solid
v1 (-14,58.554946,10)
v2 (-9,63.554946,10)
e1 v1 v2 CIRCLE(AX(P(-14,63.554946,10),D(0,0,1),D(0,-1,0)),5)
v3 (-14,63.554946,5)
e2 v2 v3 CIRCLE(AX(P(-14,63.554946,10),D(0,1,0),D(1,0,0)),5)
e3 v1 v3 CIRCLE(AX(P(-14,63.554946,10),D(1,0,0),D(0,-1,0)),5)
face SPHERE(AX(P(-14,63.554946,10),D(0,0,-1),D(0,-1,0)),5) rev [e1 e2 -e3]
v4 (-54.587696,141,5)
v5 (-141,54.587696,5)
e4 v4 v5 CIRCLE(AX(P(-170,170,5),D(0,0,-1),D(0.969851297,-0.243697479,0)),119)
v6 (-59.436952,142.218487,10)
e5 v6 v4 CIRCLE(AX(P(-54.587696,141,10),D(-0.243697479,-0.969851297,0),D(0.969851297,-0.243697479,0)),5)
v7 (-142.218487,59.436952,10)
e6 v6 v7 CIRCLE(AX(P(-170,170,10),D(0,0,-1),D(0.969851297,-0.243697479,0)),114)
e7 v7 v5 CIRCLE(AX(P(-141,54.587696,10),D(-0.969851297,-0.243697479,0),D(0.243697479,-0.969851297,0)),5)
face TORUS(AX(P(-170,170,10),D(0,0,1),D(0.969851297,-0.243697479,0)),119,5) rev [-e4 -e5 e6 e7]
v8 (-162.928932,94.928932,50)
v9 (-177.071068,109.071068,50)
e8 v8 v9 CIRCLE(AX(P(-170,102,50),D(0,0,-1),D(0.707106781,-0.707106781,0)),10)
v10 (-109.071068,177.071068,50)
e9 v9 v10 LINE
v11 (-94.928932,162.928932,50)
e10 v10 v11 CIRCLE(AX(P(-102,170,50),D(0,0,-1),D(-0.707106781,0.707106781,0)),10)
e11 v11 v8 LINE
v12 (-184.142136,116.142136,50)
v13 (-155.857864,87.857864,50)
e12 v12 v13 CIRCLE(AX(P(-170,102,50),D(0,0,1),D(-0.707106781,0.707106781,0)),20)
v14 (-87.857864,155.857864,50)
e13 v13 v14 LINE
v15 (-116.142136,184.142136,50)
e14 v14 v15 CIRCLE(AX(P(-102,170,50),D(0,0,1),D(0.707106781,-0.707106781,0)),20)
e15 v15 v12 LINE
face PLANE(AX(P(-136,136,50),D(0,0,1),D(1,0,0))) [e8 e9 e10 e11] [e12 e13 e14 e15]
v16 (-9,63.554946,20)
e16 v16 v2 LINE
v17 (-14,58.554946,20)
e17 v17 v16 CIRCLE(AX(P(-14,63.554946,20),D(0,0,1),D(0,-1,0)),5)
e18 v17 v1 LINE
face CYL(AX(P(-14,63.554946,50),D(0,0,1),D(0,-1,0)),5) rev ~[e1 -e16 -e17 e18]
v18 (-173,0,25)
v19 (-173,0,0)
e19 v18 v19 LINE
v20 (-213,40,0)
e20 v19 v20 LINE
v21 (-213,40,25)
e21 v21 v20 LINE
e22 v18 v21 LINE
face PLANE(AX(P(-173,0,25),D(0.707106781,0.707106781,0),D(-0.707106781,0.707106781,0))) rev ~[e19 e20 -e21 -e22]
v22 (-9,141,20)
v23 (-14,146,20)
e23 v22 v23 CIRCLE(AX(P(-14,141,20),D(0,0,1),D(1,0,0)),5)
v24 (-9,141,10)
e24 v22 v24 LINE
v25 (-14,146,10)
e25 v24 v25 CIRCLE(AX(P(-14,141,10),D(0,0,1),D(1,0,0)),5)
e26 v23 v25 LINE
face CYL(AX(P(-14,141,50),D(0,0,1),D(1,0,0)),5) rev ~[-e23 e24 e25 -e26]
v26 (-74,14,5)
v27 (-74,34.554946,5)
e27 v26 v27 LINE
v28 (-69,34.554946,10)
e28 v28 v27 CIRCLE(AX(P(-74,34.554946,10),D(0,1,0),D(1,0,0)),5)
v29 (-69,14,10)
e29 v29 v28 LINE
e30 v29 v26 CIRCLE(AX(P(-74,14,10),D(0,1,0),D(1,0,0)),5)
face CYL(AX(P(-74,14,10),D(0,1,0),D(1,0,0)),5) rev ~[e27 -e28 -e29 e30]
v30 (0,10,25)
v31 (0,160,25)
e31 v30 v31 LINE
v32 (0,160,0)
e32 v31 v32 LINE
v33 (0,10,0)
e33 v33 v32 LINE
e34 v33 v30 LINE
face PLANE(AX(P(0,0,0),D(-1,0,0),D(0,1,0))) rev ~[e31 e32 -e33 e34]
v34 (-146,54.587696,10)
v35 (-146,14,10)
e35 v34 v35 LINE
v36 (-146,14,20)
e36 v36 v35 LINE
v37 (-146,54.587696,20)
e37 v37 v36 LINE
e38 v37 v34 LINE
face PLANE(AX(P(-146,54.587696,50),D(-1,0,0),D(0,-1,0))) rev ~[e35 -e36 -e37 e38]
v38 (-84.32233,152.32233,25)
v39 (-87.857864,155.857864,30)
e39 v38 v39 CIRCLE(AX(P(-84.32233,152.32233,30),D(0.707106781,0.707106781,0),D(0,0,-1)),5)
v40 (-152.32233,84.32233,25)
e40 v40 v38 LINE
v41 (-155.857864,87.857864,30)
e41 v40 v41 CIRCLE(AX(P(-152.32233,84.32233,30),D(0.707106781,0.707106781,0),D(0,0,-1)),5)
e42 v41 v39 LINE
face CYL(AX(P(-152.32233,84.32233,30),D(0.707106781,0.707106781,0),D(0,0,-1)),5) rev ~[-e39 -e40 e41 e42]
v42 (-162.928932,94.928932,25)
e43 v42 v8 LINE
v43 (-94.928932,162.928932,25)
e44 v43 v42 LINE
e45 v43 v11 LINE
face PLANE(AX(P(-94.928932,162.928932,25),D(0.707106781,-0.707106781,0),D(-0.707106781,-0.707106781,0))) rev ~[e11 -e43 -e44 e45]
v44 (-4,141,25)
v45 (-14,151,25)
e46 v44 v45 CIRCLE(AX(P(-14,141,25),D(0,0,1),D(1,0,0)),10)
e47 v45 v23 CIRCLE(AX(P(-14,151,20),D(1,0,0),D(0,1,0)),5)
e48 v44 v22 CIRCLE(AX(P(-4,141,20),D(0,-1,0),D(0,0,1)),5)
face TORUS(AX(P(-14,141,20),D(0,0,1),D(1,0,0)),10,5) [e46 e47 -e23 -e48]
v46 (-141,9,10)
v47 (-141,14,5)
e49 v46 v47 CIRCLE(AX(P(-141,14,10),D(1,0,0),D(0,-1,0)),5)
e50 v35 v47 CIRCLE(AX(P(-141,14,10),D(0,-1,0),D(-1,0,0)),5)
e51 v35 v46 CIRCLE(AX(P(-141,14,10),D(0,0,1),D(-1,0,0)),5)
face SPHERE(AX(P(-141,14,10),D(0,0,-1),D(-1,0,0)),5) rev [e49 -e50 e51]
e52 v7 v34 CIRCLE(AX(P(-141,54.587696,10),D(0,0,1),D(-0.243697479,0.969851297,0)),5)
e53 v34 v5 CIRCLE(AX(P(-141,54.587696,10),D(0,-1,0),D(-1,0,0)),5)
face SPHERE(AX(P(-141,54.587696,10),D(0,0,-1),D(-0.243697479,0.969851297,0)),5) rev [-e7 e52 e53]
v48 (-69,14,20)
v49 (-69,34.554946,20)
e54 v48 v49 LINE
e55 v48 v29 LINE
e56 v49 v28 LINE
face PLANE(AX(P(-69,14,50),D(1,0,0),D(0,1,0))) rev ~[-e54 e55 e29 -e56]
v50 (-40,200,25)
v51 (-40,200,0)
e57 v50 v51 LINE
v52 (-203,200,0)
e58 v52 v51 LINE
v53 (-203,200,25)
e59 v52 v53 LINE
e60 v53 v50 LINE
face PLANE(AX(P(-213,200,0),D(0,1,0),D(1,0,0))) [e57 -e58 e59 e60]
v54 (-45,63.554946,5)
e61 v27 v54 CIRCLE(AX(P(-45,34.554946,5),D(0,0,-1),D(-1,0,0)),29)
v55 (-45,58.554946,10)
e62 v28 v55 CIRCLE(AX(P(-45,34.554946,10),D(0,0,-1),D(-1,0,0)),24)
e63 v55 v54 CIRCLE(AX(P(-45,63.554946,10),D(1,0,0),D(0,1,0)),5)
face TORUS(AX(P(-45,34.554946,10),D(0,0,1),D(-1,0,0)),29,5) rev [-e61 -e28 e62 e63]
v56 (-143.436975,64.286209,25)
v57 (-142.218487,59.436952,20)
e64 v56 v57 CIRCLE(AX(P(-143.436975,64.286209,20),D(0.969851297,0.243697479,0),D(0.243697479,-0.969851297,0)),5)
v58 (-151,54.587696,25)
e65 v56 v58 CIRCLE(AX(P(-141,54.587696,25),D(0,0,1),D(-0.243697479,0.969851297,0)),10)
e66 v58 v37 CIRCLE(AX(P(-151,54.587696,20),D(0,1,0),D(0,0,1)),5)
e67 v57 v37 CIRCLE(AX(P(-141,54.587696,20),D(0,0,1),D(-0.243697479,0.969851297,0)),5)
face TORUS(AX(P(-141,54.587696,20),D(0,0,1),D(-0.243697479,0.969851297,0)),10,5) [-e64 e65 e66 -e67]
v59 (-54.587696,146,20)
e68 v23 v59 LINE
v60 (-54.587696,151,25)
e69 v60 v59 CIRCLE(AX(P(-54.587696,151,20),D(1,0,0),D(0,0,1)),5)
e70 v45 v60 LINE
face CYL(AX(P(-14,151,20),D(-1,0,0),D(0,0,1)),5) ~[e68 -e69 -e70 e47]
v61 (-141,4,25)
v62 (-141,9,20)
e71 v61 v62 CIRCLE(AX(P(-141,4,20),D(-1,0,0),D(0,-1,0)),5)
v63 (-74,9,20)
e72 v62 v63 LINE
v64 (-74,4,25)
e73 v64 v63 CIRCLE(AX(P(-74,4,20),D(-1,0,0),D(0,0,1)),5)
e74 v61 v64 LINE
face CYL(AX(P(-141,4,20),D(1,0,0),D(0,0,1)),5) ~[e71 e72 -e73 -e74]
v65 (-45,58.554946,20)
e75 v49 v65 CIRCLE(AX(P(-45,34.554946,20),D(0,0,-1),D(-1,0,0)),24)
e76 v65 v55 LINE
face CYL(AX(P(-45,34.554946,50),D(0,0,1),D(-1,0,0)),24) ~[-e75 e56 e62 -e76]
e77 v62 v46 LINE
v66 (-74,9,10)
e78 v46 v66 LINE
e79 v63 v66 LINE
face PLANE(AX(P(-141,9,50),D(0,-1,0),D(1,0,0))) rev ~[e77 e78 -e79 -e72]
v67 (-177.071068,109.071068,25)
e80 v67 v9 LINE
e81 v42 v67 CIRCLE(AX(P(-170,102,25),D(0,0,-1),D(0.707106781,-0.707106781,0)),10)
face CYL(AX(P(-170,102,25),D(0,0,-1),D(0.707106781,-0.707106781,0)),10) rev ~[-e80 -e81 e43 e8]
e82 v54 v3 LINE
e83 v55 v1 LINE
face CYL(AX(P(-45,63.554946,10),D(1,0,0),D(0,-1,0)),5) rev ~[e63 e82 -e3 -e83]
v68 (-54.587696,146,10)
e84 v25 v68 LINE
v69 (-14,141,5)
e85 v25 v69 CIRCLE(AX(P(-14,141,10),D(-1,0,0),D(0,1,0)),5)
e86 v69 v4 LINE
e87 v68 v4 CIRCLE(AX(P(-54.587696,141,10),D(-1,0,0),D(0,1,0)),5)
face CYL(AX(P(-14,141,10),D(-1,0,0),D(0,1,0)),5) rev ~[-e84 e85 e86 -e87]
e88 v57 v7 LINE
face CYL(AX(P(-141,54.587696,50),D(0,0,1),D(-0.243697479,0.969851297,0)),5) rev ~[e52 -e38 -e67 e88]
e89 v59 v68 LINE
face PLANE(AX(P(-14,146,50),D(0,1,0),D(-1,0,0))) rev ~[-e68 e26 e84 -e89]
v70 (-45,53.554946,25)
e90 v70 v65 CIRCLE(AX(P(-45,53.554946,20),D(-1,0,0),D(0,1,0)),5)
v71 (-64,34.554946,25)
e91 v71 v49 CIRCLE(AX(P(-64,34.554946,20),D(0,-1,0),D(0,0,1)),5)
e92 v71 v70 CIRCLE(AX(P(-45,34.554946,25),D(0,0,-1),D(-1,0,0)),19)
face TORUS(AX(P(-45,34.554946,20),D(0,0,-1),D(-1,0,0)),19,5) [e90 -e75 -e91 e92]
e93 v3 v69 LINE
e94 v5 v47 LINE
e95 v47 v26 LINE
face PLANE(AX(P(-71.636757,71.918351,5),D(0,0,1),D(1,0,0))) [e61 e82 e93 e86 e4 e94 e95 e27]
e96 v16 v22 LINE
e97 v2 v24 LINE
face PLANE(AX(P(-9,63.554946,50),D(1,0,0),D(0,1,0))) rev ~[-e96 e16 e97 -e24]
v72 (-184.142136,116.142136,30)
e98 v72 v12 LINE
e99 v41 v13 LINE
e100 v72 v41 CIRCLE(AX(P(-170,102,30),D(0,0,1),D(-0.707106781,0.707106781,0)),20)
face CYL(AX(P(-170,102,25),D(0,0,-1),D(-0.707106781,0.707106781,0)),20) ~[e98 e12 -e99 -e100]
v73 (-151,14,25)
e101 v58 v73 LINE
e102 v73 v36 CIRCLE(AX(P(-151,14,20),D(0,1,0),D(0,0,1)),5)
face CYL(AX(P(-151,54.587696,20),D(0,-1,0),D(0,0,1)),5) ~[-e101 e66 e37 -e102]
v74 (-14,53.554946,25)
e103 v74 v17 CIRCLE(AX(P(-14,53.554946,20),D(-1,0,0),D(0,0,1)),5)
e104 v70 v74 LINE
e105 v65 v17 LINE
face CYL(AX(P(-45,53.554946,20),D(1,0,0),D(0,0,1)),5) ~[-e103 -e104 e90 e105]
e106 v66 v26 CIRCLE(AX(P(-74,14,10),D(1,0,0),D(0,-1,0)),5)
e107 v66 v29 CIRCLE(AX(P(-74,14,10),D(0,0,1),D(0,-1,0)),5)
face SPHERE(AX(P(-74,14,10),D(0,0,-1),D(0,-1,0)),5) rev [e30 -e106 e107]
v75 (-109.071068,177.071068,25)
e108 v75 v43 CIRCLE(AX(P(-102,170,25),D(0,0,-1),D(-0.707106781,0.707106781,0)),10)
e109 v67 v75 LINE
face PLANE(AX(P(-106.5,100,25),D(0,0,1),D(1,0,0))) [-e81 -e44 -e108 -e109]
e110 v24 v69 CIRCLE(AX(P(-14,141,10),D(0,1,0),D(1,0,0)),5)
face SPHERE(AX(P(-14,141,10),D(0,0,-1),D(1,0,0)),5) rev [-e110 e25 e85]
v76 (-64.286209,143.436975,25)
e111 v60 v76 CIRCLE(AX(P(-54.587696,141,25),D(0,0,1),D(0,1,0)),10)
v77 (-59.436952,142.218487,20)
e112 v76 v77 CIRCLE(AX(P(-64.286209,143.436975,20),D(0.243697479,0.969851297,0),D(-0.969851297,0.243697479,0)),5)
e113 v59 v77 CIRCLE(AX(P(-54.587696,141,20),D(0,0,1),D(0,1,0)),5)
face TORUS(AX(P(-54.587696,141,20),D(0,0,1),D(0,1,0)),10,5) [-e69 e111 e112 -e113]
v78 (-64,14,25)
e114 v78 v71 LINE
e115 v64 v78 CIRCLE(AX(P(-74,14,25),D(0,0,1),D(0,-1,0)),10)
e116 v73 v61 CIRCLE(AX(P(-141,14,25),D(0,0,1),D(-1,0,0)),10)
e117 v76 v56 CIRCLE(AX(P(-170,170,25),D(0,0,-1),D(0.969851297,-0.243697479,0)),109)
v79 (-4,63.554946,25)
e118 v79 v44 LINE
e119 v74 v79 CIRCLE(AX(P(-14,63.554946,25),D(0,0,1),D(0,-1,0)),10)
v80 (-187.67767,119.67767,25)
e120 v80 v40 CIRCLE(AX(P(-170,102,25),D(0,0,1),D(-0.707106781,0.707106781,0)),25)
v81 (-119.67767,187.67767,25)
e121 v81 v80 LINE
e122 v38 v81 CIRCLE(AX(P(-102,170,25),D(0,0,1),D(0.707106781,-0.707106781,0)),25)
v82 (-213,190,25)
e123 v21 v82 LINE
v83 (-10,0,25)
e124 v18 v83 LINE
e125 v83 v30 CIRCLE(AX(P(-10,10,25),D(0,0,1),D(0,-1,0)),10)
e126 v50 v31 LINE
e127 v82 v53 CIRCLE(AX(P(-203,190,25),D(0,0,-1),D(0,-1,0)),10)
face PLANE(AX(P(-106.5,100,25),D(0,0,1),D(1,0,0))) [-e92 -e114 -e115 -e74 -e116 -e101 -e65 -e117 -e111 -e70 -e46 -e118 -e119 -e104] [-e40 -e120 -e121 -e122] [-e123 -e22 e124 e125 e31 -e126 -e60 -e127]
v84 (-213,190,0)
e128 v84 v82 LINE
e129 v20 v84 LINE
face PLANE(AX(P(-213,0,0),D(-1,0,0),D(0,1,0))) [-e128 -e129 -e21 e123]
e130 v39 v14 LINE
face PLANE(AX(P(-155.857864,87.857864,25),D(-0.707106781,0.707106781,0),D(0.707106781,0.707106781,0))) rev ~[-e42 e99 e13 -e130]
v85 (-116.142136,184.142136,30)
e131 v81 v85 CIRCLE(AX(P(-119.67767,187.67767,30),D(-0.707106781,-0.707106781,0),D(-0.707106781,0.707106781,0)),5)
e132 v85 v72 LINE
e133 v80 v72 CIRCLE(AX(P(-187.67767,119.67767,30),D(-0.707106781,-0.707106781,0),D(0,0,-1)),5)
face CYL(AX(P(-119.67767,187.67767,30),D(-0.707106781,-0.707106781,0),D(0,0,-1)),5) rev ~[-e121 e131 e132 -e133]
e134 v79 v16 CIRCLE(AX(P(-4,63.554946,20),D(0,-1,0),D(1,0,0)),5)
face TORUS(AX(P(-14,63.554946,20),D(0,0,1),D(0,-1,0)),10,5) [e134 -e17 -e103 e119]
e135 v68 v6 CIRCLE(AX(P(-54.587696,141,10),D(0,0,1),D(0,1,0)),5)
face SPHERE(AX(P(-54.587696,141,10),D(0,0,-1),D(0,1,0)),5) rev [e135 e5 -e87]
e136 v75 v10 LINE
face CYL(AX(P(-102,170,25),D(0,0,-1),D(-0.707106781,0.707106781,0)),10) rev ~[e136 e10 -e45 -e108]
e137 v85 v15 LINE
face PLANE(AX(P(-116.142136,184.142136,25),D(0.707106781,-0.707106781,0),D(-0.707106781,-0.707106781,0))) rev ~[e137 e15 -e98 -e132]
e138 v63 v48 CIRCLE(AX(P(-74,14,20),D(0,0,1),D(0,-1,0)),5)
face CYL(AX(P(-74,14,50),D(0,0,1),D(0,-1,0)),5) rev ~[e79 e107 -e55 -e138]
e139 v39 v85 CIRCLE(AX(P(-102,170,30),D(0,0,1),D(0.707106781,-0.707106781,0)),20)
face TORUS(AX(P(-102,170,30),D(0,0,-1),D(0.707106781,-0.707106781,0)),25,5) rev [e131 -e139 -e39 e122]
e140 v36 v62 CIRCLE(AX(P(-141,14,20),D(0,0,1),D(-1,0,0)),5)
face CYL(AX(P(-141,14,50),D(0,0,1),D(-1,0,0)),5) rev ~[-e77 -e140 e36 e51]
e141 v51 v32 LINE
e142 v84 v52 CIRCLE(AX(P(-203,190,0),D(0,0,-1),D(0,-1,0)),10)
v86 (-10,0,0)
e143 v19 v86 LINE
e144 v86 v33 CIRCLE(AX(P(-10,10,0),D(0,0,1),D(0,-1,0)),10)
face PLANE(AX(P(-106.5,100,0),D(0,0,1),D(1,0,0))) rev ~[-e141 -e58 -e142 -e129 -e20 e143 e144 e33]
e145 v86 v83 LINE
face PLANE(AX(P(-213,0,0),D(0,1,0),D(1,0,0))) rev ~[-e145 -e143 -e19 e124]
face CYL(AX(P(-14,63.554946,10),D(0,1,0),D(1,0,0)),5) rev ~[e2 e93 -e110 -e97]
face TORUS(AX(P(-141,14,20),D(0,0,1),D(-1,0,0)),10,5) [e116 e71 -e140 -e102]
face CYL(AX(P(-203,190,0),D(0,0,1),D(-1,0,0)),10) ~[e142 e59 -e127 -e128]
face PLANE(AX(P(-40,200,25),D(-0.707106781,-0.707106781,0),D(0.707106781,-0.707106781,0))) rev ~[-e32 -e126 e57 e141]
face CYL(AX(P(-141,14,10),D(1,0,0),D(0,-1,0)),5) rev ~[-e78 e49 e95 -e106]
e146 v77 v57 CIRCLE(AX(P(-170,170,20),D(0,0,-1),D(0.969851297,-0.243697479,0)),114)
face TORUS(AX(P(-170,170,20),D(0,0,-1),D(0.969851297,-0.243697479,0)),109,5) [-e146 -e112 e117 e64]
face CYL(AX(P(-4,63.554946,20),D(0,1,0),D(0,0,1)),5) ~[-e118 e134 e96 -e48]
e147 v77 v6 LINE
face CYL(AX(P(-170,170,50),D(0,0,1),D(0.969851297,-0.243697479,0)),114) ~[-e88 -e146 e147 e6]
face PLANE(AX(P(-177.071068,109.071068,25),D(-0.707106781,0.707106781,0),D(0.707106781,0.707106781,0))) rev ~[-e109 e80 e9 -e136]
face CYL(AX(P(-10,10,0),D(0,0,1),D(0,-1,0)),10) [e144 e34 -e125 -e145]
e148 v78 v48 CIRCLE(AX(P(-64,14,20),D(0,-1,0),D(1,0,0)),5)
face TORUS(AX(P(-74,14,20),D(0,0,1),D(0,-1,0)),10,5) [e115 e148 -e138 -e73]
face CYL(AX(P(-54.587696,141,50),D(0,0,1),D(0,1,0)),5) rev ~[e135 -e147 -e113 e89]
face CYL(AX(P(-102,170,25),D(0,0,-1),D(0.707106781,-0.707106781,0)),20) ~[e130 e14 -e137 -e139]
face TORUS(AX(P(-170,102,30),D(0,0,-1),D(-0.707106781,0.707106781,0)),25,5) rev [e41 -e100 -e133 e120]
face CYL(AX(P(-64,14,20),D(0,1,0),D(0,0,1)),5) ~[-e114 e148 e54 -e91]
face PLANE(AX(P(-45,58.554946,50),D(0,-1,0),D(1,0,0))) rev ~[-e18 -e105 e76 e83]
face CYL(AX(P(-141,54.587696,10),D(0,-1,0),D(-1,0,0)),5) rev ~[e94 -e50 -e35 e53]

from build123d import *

# Parameters (mm, degrees)
F0_W     = 213
F0_H     = 200
F1_DEPTH = 25
F3_DEPTH = 50
F5_DEPTH = 25
F6_R     = 5
F7_DEPTH = 45
F8_R     = 5
F9_R     = 10


with BuildPart() as f1:
    # F0 (on Top) → F1 (new body)
    with BuildSketch(Plane.XY):
        with Locations((-106.5, 100)):
            Rectangle(F0_W, F0_H)
    extrude(amount=F1_DEPTH)

    # F2 (on face) → F3 (cut)
    with BuildSketch(Plane.XY.offset(25)):
        Polygon((0, 160), (0, 200), (-40, 200), align=None)
        Polygon((-213, 40), (-213, 0), (-173, 0), align=None)
    extrude(amount=-F3_DEPTH, mode=Mode.SUBTRACT)

    # F4 (on face) → F5 (join)
    with BuildSketch(Plane.XY.offset(25)):
        with BuildLine():
            ThreePointArc((-184.1421356237, 116.1421356237), (-184.1421356237, 87.8578643763), (-155.8578643763, 87.8578643763))
            Line((-155.8578643763, 87.8578643763), (-87.8578643763, 155.8578643763))
            ThreePointArc((-87.8578643763, 155.8578643763), (-87.8578643763, 184.1421356237), (-116.1421356237, 184.1421356237))
            Line((-116.1421356237, 184.1421356237), (-184.1421356237, 116.1421356237))
        make_face()
        with BuildLine():
            Line((-94.9289321881, 162.9289321881), (-162.9289321881, 94.9289321881))
            ThreePointArc((-162.9289321881, 94.9289321881), (-177.0710678119, 94.9289321881), (-177.0710678119, 109.0710678119))
            Line((-177.0710678119, 109.0710678119), (-109.0710678119, 177.0710678119))
            ThreePointArc((-109.0710678119, 177.0710678119), (-94.9289321881, 177.0710678119), (-94.9289321881, 162.9289321881))
        make_face(mode=Mode.SUBTRACT)
        with BuildLine():
            ThreePointArc((-59.4369521161, 142.218487395), (-89.3898269447, 89.3898269447), (-142.218487395, 59.4369521161))
            ThreePointArc((-142.218487395, 59.4369521161), (-144.9428693216, 57.6623958613), (-146, 54.58769563))
            Line((-146, 54.58769563), (-146, 14))
            ThreePointArc((-146, 14), (-144.5355339059, 10.4644660941), (-141, 9))
            Line((-141, 9), (-74, 9))
            ThreePointArc((-74, 9), (-70.4644660941, 10.4644660941), (-69, 14))
            Line((-69, 14), (-69, 34.554946274))
            ThreePointArc((-69, 34.554946274), (-61.9705627485, 51.5255090224), (-45, 58.554946274))
            Line((-45, 58.554946274), (-14, 58.554946274))
            ThreePointArc((-14, 58.554946274), (-10.4644660941, 60.019412368), (-9, 63.554946274))
            Line((-9, 63.554946274), (-9, 141))
            ThreePointArc((-9, 141), (-10.4644660941, 144.5355339059), (-14, 146))
            Line((-14, 146), (-54.58769563, 146))
            ThreePointArc((-54.58769563, 146), (-57.6623958613, 144.9428693216), (-59.4369521161, 142.218487395))
        make_face()
    extrude(amount=F5_DEPTH)

    # F6
    f6_edges = [f1.edges().sort_by_distance(p)[0] for p in [
        (-121.857864, 121.857864, 25),
    ]]
    fillet(f6_edges, radius=F6_R)

    # F7 (cut): a face of the model
    f7_faces = [f1.faces().sort_by_distance(p)[0] for p in [
        (-71.1078293712, 72.4638953315, 50),
    ]]
    extrude(f7_faces, amount=-F7_DEPTH, mode=Mode.SUBTRACT)

    # F8
    f8_edges = [f1.edges().sort_by_distance(p)[0] for p in [
        (-146, 34.293848, 25),
        (-89.389827, 89.389827, 5),
    ]]
    fillet(f8_edges, radius=F8_R)

    # F9
    f9_edges = [f1.edges().sort_by_distance(p)[0] for p in [
        (0, 0, 12.5),
        (-213, 200, 12.5),
    ]]
    fillet(f9_edges, radius=F9_R)


solid = f1.part
